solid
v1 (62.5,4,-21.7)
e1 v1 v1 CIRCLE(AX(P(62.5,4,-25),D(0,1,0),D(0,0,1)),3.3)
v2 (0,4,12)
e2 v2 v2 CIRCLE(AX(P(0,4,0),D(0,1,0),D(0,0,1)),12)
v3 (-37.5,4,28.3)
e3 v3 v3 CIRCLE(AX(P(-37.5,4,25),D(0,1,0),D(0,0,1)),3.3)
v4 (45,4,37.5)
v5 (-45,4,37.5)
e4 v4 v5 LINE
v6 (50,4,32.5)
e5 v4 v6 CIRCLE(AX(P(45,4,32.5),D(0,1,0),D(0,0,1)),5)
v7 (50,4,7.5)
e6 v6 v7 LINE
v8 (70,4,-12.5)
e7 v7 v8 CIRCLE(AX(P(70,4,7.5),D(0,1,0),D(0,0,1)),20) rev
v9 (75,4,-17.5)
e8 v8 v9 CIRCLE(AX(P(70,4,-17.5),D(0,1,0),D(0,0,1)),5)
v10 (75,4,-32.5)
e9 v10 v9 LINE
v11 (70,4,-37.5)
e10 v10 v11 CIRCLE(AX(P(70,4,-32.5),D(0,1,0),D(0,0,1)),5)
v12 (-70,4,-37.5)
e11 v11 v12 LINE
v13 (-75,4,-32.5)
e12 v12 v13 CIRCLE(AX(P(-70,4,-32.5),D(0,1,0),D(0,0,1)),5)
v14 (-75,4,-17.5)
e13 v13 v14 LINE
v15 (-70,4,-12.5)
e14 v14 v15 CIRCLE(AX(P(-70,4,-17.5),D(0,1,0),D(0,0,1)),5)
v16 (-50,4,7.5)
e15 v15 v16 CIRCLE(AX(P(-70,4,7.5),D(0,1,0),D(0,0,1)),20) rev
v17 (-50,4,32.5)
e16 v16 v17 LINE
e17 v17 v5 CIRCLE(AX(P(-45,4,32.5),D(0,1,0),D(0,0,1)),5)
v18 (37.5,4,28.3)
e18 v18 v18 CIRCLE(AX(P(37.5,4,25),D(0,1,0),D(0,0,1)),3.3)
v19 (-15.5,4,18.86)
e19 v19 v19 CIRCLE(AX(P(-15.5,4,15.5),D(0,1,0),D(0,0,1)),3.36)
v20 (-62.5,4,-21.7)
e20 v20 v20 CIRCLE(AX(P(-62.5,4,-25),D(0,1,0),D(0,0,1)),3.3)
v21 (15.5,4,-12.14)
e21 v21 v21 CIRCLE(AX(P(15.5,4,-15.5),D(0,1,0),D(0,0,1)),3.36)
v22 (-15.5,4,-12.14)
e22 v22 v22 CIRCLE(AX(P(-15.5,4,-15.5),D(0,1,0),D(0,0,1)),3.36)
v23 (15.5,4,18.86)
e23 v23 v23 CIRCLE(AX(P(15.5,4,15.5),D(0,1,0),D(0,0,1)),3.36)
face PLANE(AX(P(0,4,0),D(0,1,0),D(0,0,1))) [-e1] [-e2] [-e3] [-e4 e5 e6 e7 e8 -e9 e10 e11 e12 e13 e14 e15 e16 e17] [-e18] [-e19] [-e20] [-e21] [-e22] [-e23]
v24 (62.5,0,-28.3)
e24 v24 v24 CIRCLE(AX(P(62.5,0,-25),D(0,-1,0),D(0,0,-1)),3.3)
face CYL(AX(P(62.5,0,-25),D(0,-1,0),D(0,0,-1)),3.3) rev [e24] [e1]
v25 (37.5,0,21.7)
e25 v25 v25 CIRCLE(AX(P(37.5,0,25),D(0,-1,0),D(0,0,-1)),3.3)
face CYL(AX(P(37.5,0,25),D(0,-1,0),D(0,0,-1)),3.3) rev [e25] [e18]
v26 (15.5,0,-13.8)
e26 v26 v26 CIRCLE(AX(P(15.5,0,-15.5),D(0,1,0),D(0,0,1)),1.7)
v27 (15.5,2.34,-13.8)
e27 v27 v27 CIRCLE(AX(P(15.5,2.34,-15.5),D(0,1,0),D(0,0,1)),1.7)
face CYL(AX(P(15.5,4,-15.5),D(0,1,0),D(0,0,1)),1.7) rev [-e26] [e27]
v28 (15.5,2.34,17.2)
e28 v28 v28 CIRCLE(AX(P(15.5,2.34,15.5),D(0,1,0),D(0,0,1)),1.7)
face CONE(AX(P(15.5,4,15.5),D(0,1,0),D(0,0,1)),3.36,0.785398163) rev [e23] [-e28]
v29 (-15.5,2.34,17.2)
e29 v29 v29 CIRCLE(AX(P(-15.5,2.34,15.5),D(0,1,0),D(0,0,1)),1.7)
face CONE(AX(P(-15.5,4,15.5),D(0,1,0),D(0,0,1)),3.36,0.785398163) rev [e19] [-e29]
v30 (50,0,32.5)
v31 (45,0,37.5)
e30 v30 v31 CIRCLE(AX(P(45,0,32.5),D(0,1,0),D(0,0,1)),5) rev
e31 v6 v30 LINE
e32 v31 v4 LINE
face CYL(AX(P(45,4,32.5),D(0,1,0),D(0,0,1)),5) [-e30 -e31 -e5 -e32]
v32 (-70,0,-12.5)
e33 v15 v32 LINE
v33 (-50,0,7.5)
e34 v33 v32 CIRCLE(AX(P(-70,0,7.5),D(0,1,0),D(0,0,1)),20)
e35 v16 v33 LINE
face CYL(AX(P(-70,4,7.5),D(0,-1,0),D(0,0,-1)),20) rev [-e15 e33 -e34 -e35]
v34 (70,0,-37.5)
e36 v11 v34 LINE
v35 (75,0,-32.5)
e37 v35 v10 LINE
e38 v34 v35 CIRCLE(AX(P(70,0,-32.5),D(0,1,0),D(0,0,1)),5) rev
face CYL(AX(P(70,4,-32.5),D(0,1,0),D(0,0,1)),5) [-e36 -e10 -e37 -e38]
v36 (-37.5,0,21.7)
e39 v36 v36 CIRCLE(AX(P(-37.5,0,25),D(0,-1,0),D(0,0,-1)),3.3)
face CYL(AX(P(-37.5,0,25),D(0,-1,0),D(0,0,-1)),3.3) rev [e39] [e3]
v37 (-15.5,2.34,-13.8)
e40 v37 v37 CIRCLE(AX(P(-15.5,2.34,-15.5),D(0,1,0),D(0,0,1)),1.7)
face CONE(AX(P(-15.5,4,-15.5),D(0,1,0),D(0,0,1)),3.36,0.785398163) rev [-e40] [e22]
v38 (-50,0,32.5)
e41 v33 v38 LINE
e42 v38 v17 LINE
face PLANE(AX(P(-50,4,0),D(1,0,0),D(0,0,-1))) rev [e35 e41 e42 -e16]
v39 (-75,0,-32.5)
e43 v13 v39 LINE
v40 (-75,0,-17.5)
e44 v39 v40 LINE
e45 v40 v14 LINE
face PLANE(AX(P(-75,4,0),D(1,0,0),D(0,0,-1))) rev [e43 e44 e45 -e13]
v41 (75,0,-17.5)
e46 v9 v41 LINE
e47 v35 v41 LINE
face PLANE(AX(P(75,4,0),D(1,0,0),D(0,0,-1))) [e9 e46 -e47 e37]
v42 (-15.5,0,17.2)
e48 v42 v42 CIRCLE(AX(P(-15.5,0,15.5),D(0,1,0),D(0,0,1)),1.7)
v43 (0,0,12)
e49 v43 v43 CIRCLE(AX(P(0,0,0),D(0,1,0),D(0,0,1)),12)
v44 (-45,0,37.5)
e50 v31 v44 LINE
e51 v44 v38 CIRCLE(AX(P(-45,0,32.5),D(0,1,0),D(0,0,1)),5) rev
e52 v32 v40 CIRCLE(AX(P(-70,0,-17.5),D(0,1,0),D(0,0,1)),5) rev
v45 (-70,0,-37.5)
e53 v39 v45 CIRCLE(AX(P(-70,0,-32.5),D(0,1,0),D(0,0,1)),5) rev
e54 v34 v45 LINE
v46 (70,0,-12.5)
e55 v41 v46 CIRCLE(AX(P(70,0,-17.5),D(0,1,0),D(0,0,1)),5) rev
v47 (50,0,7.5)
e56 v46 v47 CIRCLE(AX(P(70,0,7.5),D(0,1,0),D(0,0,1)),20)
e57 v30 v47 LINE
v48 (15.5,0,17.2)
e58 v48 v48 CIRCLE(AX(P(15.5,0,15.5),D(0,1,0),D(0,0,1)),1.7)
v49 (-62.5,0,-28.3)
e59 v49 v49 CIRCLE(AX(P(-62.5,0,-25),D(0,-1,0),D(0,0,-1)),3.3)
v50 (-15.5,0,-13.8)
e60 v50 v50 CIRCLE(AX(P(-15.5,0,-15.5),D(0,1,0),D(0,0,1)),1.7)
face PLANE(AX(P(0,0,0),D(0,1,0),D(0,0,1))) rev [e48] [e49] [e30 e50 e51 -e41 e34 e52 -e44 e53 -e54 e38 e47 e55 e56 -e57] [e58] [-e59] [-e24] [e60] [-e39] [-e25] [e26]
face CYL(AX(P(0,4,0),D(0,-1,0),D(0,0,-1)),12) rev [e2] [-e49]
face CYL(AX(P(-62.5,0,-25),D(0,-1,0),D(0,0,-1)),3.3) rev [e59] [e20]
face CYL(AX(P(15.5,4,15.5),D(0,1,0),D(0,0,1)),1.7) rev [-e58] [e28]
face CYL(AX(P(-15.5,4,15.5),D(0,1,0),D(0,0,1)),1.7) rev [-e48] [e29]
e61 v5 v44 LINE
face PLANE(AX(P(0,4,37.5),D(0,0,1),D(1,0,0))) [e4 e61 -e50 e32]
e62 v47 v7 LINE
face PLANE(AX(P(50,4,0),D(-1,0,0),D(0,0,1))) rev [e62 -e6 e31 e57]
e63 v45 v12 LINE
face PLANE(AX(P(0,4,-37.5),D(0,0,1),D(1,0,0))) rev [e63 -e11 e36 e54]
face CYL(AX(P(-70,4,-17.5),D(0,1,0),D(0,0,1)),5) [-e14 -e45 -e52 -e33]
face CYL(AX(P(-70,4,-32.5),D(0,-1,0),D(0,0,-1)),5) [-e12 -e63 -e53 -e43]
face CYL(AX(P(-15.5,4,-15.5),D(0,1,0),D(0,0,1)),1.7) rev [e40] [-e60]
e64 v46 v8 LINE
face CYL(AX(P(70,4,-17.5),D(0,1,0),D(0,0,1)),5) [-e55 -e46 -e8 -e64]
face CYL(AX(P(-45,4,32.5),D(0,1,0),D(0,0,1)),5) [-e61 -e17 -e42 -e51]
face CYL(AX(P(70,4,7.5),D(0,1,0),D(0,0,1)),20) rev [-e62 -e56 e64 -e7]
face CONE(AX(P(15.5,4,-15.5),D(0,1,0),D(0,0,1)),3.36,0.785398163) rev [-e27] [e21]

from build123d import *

# Parameters (mm, degrees)
SKETCH1_W                                            = 25
SKETCH1_H                                            = 25
SKETCH1_W_2                                          = 100
SKETCH1_H_2                                          = 75
SKETCH1_R                                            = 12
BOSS_EXTRUDE1_DEPTH                                  = 4
CSK_FOR_M3_HEX_SOCKET_COUNTERSUNK_CAP_SC_D           = 3.4
CSK_FOR_M3_HEX_SOCKET_COUNTERSUNK_CAP_SC_CSINK_D     = 6.72
CSK_FOR_M3_HEX_SOCKET_COUNTERSUNK_CAP_SC_CSINK_ANGLE = 90
M6_CLEARANCE_HOLE2_D                                 = 6.6
FILLET1_R                                            = 5
FILLET2_R                                            = 20


with BuildPart() as part:
    # Sketch1 → Boss-Extrude1 (new body)
    # profile 1 of 3: a face of its own
    with BuildSketch(Plane(origin=(0, 0, 0), x_dir=(1, 0, 0), z_dir=(0, 1, 0))):
        with Locations((-62.5, 25)):
            Rectangle(SKETCH1_W, SKETCH1_H)
    # profile 2 of 3: a face of its own
    with BuildSketch(Plane(origin=(0, 0, 0), x_dir=(1, 0, 0), z_dir=(0, 1, 0))):
        Rectangle(SKETCH1_W_2, SKETCH1_H_2)
        with Locations(Location((0, 0, 0), (0, 0, 270))):
            Circle(SKETCH1_R, mode=Mode.SUBTRACT)
    # profile 3 of 3: a face of its own
    with BuildSketch(Plane(origin=(0, 0, 0), x_dir=(1, 0, 0), z_dir=(0, 1, 0))):
        with Locations((62.5, 25)):
            Rectangle(SKETCH1_W, SKETCH1_H)
    extrude(amount=BOSS_EXTRUDE1_DEPTH)

    # CSK for M3 Hex Socket Countersunk Cap Screw1 (through all)
    with Locations(Plane(origin=(-15.5, 4, 15.5), x_dir=(0, 0, 1), z_dir=(0, 1, 0))):
        with Locations((0, 0), (0, 31), (-31, 31), (-31, 0)):
            CounterSinkHole(CSK_FOR_M3_HEX_SOCKET_COUNTERSUNK_CAP_SC_D / 2, CSK_FOR_M3_HEX_SOCKET_COUNTERSUNK_CAP_SC_CSINK_D / 2, counter_sink_angle=CSK_FOR_M3_HEX_SOCKET_COUNTERSUNK_CAP_SC_CSINK_ANGLE)

    # M6 Clearance Hole2 (through all)
    with Locations(Plane(origin=(0, 0, 0), x_dir=(-1, 0, 0), z_dir=(0, -1, 0))):
        with Locations((62.5, 25), (37.5, -25), (-37.5, -25), (-62.5, 25)):
            Hole(M6_CLEARANCE_HOLE2_D / 2)

    # Fillet1
    fillet1_edges = [part.edges().sort_by_distance(p)[0] for p in [
        (75, 2, -37.5),
        (75, 2, -12.5),
        (50, 2, 37.5),
        (-50, 2, 37.5),
        (-75, 2, -12.5),
        (-75, 2, -37.5),
    ]]
    fillet(fillet1_edges, radius=FILLET1_R)

    # Fillet2
    fillet2_edges = [part.edges().sort_by_distance(p)[0] for p in [
        (50, 2, -12.5),
        (-50, 2, -12.5),
    ]]
    fillet(fillet2_edges, radius=FILLET2_R - 0.0001)  # a hair under: the kernel refuses the full size


solid = part.part
